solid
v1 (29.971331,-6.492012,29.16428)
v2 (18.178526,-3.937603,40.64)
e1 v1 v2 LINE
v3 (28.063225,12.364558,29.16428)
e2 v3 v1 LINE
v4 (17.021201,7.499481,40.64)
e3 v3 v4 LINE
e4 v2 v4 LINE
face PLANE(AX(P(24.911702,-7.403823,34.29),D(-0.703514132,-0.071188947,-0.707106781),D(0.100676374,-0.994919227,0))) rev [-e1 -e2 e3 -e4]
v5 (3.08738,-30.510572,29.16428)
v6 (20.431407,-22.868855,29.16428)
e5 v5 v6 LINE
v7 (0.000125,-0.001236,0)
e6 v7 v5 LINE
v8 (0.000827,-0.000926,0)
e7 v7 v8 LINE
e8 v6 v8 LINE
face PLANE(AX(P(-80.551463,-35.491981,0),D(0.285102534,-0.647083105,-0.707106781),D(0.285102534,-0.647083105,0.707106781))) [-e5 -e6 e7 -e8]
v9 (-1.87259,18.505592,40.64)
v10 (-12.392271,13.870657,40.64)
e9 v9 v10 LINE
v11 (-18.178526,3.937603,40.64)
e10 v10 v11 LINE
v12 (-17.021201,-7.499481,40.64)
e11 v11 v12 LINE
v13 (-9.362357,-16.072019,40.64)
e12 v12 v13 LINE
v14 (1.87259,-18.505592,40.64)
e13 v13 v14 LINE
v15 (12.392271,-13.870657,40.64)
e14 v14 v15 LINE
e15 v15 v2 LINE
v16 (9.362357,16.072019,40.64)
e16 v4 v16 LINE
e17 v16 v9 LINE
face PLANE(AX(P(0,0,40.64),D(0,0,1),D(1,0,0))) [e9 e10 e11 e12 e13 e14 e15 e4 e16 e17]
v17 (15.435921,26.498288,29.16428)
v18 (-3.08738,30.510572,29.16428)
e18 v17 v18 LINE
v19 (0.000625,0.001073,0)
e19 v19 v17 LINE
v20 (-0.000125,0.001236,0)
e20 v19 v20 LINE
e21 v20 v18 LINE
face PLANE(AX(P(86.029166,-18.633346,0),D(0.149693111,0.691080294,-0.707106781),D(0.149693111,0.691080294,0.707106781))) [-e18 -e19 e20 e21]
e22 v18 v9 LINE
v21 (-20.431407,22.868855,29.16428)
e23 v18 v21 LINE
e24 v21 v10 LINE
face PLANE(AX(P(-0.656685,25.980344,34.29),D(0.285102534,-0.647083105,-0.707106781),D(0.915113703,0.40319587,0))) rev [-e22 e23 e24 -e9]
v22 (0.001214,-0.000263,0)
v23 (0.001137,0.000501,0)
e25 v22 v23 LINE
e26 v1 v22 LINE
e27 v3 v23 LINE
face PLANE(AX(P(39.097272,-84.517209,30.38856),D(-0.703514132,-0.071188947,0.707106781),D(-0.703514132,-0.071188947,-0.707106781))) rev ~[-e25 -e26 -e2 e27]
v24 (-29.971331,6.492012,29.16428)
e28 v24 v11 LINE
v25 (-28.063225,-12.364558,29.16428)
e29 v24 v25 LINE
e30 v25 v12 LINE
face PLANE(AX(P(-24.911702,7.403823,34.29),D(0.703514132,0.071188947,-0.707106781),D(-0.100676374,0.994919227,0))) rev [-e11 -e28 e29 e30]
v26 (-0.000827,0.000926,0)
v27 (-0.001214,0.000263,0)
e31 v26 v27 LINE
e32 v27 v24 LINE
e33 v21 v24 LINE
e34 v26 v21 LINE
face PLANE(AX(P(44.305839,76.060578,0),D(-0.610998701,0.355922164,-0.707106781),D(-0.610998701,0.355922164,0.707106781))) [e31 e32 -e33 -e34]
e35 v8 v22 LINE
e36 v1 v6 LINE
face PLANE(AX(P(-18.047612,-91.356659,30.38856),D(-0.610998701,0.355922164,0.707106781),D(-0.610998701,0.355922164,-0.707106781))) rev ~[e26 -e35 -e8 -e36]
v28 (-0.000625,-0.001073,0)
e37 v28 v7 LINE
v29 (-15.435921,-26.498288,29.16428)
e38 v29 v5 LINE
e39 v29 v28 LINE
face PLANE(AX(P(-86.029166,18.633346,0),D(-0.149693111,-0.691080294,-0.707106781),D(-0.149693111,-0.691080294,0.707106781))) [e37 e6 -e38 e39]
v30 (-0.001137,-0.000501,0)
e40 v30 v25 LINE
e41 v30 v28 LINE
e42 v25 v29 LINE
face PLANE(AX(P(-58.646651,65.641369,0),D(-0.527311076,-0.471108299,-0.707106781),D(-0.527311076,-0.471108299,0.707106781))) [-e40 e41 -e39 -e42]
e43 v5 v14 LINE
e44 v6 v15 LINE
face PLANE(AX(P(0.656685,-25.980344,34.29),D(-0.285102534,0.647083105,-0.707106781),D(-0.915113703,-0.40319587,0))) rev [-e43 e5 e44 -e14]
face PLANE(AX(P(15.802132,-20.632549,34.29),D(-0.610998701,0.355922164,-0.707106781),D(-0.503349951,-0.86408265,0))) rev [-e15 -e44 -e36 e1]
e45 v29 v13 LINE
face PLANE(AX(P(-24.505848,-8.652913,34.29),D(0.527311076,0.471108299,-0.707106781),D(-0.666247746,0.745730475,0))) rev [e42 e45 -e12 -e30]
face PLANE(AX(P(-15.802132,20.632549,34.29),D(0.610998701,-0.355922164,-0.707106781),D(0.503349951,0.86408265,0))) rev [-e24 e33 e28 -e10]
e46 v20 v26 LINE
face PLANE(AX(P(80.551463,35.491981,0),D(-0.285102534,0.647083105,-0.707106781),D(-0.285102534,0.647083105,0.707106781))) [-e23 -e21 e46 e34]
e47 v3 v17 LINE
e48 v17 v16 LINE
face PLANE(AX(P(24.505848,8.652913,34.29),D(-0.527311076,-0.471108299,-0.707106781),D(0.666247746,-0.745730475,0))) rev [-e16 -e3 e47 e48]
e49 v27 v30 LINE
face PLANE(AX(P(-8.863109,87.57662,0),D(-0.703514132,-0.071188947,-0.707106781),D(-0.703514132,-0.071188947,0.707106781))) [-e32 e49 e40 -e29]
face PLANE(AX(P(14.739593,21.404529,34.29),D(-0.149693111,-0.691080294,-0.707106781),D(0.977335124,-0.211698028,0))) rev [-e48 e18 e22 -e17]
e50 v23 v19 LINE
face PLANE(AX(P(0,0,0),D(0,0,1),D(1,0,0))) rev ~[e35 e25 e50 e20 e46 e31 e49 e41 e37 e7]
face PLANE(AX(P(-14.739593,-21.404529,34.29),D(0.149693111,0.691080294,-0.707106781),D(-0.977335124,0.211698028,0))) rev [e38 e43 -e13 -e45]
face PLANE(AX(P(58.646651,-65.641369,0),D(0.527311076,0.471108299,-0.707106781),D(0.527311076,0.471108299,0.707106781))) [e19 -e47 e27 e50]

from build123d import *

# Parameters (mm, degrees)
F1_DEPTH     = 40.64
F2_SIZE      = 12.7
F3_T1_DEPTH  = 176.0479365306
F3_T3_DEPTH  = 176.0479365306
F3_T5_DEPTH  = 176.0479365306
F3_T7_DEPTH  = 176.0479365306
F3_T9_DEPTH  = 176.0479365306
F3_T11_DEPTH = 176.0479365306
F3_T13_DEPTH = 176.0479365306
F3_T15_DEPTH = 176.0479365306
F3_T17_DEPTH = 176.0479365306
F3_T19_DEPTH = 176.0479365306


# Not quite as in the source:
# - a fillet or chamfer that OpenCascade refuses, or shapes differently, is made with other operations: its cross-section is extruded or revolved along the edge and cut away or added


with BuildPart() as f1:
    # F0 (on Top) → F1 (new body)
    with BuildSketch(Plane.XY):
        Polygon((29.2412366164, 12.8835857291), (16.083875671, 27.6106074452), (-3.2169791099, 31.7913155674), (-21.2890572119, 23.8288216898), (-31.2294390474, 6.7645278386), (-29.2412366164, -12.8835857291), (-16.083875671, -27.6106074452), (3.2169791099, -31.7913155674), (21.2890572119, -23.8288216898), (31.2294390474, -6.7645278386), align=None)
    extrude(amount=F1_DEPTH)

    # F2
    f2_edges = [f1.edges().sort_by_distance(p)[0] for p in [
        (12.253018, -27.810069, 40.64),
        (26.259248, -15.296675, 40.64),
        (30.235338, 3.059529, 40.64),
        (22.662556, 20.247097, 40.64),
        (6.433448, 29.700962, 40.64),
        (-12.253018, 27.810069, 40.64),
        (-26.259248, 15.296675, 40.64),
        (-30.235338, -3.059529, 40.64),
        (-22.662556, -20.247097, 40.64),
        (-6.433448, -29.700962, 40.64),
    ]]
    chamfer(f2_edges, length=F2_SIZE)

    # F3: chamfer of 30.38856 on 10 edges, made by hand

    # F3_s2 → F3_t1 (cut)
    with BuildSketch(Plane(origin=(-86.0289159586, 18.6345004803, 0), x_dir=(0, 0, 1), z_dir=(0.9773351242, -0.2116980278, 0))):
        Polygon((0, 0.001181216), (30.38856, 30.389741216), (0, 30.389741216), align=None)
    extrude(amount=F3_T1_DEPTH, mode=Mode.SUBTRACT)

    # F3_s4 → F3_t3 (cut)
    with BuildSketch(Plane(origin=(8.8619339292, -87.5767384424, 0), x_dir=(0, 0, 1), z_dir=(-0.1006763738, 0.9949192268, 0))):
        Polygon((30.38856, 30.389741216), (0, 0.001181216), (0, 30.389741216), align=None)
    extrude(amount=F3_T3_DEPTH, mode=Mode.SUBTRACT)

    # F3_s6 → F3_t5 (cut)
    with BuildSketch(Plane(origin=(58.645770452, -65.6421556414, 0), x_dir=(0, 0, 1), z_dir=(-0.666247746, 0.7457304747, 0))):
        Polygon((0, 0.001181216), (30.38856, 30.389741216), (0, 30.389741216), align=None)
    extrude(amount=F3_T5_DEPTH, mode=Mode.SUBTRACT)

    # F3_s8 → F3_t7 (cut)
    with BuildSketch(Plane(origin=(86.0289159586, -18.6345004803, 0), x_dir=(0, 0, 1), z_dir=(-0.9773351242, 0.2116980278, 0))):
        Polygon((0, 0.001181216), (30.38856, 30.389741216), (0, 30.389741216), align=None)
    extrude(amount=F3_T7_DEPTH, mode=Mode.SUBTRACT)

    # F3_s10 → F3_t9 (cut)
    with BuildSketch(Plane(origin=(80.5519395843, 35.490900501, 0), x_dir=(0, 0, 1), z_dir=(-0.9151137034, -0.4031958704, 0))):
        Polygon((0, 0.001181216), (30.38856, 30.389741216), (0, 30.389741216), align=None)
    extrude(amount=F3_T9_DEPTH, mode=Mode.SUBTRACT)

    # F3_s12 → F3_t11 (cut)
    with BuildSketch(Plane(origin=(44.3068601486, 76.0599837822, 0), x_dir=(0, 0, 1), z_dir=(-0.5033499514, -0.8640826502, 0))):
        Polygon((0, 0.001181216), (30.38856, 30.389741216), (0, 30.389741216), align=None)
    extrude(amount=F3_T11_DEPTH, mode=Mode.SUBTRACT)

    # F3_s14 → F3_t13 (cut)
    with BuildSketch(Plane(origin=(-8.8619339292, 87.5767384424, 0), x_dir=(0, 0, 1), z_dir=(0.1006763738, -0.9949192268, 0))):
        Polygon((0, 0.001181216), (30.38856, 30.389741216), (0, 30.389741216), align=None)
    extrude(amount=F3_T13_DEPTH, mode=Mode.SUBTRACT)

    # F3_s16 → F3_t15 (cut)
    with BuildSketch(Plane(origin=(-58.645770452, 65.6421556414, 0), x_dir=(0, 0, 1), z_dir=(0.666247746, -0.7457304747, 0))):
        Polygon((0, 0.001181216), (30.38856, 30.389741216), (0, 30.389741216), align=None)
    extrude(amount=F3_T15_DEPTH, mode=Mode.SUBTRACT)

    # F3_s18 → F3_t17 (cut)
    with BuildSketch(Plane(origin=(-80.5519395843, -35.490900501, 0), x_dir=(0, 0, 1), z_dir=(0.9151137034, 0.4031958704, 0))):
        Polygon((0, 0.001181216), (30.38856, 30.389741216), (0, 30.389741216), align=None)
    extrude(amount=F3_T17_DEPTH, mode=Mode.SUBTRACT)

    # F3_s20 → F3_t19 (cut)
    with BuildSketch(Plane(origin=(-44.3068601486, -76.0599837822, 0), x_dir=(0, 0, 1), z_dir=(0.5033499514, 0.8640826502, 0))):
        Polygon((30.38856, 30.389741216), (0, 0.001181216), (0, 30.389741216), align=None)
    extrude(amount=F3_T19_DEPTH, mode=Mode.SUBTRACT)


solid = f1.part
